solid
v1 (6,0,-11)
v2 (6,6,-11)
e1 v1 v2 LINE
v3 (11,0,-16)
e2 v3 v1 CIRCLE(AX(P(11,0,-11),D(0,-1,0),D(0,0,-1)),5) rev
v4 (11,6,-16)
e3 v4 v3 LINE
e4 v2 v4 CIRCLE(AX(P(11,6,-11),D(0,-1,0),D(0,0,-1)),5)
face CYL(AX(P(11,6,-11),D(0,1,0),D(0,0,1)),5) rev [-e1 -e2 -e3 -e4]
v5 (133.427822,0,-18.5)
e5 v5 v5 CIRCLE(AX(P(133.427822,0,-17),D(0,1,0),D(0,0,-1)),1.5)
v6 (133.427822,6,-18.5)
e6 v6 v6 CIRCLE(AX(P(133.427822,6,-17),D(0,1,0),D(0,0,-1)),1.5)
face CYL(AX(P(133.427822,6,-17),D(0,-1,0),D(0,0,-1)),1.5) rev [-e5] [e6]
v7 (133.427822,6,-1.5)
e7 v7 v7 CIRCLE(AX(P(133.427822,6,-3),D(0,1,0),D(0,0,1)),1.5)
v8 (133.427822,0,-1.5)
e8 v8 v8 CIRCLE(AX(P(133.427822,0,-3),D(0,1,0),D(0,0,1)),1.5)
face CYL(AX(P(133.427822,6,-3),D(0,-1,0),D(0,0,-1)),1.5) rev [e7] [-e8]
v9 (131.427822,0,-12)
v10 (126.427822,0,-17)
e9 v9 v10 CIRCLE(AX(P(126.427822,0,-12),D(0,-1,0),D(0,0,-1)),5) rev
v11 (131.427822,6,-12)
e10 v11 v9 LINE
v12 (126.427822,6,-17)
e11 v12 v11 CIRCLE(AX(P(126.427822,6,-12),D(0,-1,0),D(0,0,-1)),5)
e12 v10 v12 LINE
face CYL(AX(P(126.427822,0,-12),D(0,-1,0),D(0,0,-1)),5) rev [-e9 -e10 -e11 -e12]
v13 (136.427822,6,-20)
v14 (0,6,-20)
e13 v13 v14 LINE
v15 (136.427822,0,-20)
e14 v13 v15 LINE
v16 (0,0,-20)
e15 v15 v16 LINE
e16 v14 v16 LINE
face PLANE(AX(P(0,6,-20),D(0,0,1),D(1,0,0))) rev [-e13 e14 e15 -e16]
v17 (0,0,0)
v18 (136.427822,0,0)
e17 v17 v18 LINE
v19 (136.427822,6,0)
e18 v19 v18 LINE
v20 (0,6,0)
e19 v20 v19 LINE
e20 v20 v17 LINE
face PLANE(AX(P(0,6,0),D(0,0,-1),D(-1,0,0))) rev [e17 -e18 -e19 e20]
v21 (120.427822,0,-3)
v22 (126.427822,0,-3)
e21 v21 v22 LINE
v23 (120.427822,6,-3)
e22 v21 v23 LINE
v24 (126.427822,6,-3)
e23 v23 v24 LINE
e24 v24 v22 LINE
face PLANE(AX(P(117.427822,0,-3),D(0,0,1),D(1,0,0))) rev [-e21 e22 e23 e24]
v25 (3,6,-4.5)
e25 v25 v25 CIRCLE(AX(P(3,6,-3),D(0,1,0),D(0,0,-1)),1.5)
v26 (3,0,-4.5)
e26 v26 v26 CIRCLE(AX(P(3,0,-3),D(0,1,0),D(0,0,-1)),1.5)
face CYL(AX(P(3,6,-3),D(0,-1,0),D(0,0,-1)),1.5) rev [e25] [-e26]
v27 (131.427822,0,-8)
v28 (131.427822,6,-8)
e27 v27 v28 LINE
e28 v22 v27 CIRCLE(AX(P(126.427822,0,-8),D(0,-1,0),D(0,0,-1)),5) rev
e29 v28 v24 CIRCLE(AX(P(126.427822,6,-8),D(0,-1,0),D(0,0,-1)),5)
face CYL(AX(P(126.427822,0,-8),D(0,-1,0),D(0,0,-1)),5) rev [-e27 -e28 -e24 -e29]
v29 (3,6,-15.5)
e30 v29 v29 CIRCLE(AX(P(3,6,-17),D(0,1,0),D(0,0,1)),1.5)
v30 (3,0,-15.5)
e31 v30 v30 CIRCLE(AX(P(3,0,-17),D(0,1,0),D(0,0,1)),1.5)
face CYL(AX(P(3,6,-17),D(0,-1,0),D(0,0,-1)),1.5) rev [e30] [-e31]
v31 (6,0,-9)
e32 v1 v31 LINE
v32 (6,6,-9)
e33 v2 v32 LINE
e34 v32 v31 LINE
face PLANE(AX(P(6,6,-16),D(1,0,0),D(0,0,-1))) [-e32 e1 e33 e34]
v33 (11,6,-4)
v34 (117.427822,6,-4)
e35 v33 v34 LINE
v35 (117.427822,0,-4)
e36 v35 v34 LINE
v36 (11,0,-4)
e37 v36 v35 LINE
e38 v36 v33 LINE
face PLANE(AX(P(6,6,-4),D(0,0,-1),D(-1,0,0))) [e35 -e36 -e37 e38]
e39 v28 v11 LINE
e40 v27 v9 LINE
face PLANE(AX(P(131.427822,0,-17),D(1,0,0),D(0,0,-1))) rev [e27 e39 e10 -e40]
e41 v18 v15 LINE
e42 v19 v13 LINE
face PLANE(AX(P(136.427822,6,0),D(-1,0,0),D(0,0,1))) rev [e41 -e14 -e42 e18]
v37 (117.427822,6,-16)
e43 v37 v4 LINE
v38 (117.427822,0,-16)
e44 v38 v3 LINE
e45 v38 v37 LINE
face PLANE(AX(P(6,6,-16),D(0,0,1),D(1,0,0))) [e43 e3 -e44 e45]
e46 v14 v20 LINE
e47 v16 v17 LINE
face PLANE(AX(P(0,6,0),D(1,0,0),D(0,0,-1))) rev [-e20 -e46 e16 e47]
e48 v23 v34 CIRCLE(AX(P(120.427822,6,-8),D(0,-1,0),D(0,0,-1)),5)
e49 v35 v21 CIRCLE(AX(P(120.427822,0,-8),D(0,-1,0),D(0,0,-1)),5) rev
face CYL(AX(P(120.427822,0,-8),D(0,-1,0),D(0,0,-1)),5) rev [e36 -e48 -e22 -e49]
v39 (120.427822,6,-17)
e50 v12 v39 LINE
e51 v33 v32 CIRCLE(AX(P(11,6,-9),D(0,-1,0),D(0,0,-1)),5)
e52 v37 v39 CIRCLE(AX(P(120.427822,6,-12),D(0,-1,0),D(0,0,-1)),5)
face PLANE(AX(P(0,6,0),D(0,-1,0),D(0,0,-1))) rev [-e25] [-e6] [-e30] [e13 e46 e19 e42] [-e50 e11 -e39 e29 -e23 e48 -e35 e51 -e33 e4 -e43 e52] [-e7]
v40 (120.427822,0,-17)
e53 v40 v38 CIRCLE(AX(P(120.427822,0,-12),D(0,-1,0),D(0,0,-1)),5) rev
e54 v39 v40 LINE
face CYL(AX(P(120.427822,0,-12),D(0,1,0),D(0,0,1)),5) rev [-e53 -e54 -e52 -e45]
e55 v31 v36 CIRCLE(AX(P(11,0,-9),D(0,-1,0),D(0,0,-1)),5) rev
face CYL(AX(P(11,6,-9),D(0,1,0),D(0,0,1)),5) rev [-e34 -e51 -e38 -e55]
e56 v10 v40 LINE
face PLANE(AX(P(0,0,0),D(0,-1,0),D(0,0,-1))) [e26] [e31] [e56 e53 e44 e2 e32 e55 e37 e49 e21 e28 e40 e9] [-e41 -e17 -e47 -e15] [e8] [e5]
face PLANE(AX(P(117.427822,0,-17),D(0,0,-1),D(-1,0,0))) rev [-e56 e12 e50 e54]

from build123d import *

# Parameters (mm, degrees)
SKETCH1_W           = 136.427821805
SKETCH1_H           = 20
SKETCH1_R           = 1.5
SKETCH1_W_2         = 124.427821805
SKETCH1_H_2         = 12
BOSS_EXTRUDE1_DEPTH = 6
CUT_EXTRUDE1_DEPTH  = 139.01648656
FILLET1_R           = 5


with BuildPart() as part:
    # Sketch1 → Boss-Extrude1 (new body)
    with BuildSketch(Plane(origin=(0, 0, 0), x_dir=(1, 0, 0), z_dir=(0, 1, 0))):
        with Locations((68.213910903, 10)):
            Rectangle(SKETCH1_W, SKETCH1_H)
        with Locations(Location((3, 17, 0), (0, 0, 270))):
            Circle(SKETCH1_R, mode=Mode.SUBTRACT)
        with Locations(Location((3, 3, 0), (0, 0, 90))):
            Circle(SKETCH1_R, mode=Mode.SUBTRACT)
        with Locations(Location((133.427821805, 3, 0), (0, 0, 270))):
            Circle(SKETCH1_R, mode=Mode.SUBTRACT)
        with Locations(Location((133.427821805, 17, 0), (0, 0, 90))):
            Circle(SKETCH1_R, mode=Mode.SUBTRACT)
        with Locations((68.213910903, 10)):
            Rectangle(SKETCH1_W_2, SKETCH1_H_2, mode=Mode.SUBTRACT)
    extrude(amount=BOSS_EXTRUDE1_DEPTH)

    # Sketch2 → Cut-Extrude1 (cut, through all)
    with BuildSketch(Plane(origin=(0, 6, 0), x_dir=(1, 0, 0), z_dir=(0, 1, 0))):
        Polygon((117.427821805, 17), (117.427821805, 16), (130.427821805, 16), (130.427821805, 4), (117.427821805, 4), (117.427821805, 3), (131.427821805, 3), (131.427821805, 17), align=None)
    extrude(amount=-CUT_EXTRUDE1_DEPTH, mode=Mode.SUBTRACT)

    # Fillet1
    # the kernel refuses this fillet: 5 mm, written as the material it adds along each edge
    with BuildSketch(Plane(origin=(131.427821805, 6, -17), x_dir=(0, 0, 1), z_dir=(0, -1, 0)), Plane(origin=(131.427821805, 6, -3), x_dir=(-1, 0, 0), z_dir=(0, -1, 0)), Plane(origin=(6, 0, -16), x_dir=(0, 0, 1), z_dir=(0, 1, 0))) as fillet1_piece_1:
        with BuildLine():
            CenterArc((FILLET1_R, FILLET1_R), FILLET1_R, 180, 90)
            Line((0, FILLET1_R), (-FILLET1_R * 0.02, FILLET1_R))
            Line((-FILLET1_R * 0.02, FILLET1_R), (-FILLET1_R * 0.02, -FILLET1_R * 0.02))
            Line((-FILLET1_R * 0.02, -FILLET1_R * 0.02), (FILLET1_R, -FILLET1_R * 0.02))
            Line((FILLET1_R, -FILLET1_R * 0.02), (FILLET1_R, 0))
        make_face()
    extrude(amount=6)
    with BuildSketch(Plane(origin=(117.427821805, 6, -17), x_dir=(1, 0, 0), z_dir=(0, -1, 0))) as fillet1_piece_2:
        with BuildLine():
            CenterArc((3, 5), FILLET1_R, 233.130102354, 36.869897646)
            Line((0, 1), (-0.06, 0.92))
            ThreePointArc((-0.06, 0.92), (-0.1, 0.5), (-0.1, 0))
            Line((-0.1, 0), (0, -0.1))
            Line((0, -0.1), (3, -0.1))
            Line((3, -0.1), (3, 0))
        make_face()
    extrude(amount=6)
    with BuildSketch(Plane(origin=(117.427821805, 6, -3), x_dir=(0, 0, -1), z_dir=(0, -1, 0))) as fillet1_piece_3:
        with BuildLine():
            CenterArc((5, 3), FILLET1_R, 180, 36.869897646)
            Line((0, 3), (-0.1, 3))
            Line((-0.1, 3), (-0.1, 0))
            Line((-0.1, 0), (0, -0.1))
            ThreePointArc((0, -0.1), (0.5, -0.1), (0.92, -0.06))
            Line((0.92, -0.06), (1, 0))
        make_face()
    extrude(amount=6)
    with BuildSketch(Plane(origin=(6, 0, -4), x_dir=(0, 0, -1), z_dir=(0, 1, 0))) as fillet1_piece_4:
        with BuildLine():
            CenterArc((FILLET1_R, -FILLET1_R), FILLET1_R, 90, 90)
            Line((0, -FILLET1_R), (-FILLET1_R * 0.02, -FILLET1_R))
            Line((-FILLET1_R * 0.02, -FILLET1_R), (-FILLET1_R * 0.02, FILLET1_R * 0.02))
            Line((-FILLET1_R * 0.02, FILLET1_R * 0.02), (FILLET1_R, FILLET1_R * 0.02))
            Line((FILLET1_R, FILLET1_R * 0.02), (FILLET1_R, 0))
        make_face()
    extrude(amount=6)


solid = part.part
